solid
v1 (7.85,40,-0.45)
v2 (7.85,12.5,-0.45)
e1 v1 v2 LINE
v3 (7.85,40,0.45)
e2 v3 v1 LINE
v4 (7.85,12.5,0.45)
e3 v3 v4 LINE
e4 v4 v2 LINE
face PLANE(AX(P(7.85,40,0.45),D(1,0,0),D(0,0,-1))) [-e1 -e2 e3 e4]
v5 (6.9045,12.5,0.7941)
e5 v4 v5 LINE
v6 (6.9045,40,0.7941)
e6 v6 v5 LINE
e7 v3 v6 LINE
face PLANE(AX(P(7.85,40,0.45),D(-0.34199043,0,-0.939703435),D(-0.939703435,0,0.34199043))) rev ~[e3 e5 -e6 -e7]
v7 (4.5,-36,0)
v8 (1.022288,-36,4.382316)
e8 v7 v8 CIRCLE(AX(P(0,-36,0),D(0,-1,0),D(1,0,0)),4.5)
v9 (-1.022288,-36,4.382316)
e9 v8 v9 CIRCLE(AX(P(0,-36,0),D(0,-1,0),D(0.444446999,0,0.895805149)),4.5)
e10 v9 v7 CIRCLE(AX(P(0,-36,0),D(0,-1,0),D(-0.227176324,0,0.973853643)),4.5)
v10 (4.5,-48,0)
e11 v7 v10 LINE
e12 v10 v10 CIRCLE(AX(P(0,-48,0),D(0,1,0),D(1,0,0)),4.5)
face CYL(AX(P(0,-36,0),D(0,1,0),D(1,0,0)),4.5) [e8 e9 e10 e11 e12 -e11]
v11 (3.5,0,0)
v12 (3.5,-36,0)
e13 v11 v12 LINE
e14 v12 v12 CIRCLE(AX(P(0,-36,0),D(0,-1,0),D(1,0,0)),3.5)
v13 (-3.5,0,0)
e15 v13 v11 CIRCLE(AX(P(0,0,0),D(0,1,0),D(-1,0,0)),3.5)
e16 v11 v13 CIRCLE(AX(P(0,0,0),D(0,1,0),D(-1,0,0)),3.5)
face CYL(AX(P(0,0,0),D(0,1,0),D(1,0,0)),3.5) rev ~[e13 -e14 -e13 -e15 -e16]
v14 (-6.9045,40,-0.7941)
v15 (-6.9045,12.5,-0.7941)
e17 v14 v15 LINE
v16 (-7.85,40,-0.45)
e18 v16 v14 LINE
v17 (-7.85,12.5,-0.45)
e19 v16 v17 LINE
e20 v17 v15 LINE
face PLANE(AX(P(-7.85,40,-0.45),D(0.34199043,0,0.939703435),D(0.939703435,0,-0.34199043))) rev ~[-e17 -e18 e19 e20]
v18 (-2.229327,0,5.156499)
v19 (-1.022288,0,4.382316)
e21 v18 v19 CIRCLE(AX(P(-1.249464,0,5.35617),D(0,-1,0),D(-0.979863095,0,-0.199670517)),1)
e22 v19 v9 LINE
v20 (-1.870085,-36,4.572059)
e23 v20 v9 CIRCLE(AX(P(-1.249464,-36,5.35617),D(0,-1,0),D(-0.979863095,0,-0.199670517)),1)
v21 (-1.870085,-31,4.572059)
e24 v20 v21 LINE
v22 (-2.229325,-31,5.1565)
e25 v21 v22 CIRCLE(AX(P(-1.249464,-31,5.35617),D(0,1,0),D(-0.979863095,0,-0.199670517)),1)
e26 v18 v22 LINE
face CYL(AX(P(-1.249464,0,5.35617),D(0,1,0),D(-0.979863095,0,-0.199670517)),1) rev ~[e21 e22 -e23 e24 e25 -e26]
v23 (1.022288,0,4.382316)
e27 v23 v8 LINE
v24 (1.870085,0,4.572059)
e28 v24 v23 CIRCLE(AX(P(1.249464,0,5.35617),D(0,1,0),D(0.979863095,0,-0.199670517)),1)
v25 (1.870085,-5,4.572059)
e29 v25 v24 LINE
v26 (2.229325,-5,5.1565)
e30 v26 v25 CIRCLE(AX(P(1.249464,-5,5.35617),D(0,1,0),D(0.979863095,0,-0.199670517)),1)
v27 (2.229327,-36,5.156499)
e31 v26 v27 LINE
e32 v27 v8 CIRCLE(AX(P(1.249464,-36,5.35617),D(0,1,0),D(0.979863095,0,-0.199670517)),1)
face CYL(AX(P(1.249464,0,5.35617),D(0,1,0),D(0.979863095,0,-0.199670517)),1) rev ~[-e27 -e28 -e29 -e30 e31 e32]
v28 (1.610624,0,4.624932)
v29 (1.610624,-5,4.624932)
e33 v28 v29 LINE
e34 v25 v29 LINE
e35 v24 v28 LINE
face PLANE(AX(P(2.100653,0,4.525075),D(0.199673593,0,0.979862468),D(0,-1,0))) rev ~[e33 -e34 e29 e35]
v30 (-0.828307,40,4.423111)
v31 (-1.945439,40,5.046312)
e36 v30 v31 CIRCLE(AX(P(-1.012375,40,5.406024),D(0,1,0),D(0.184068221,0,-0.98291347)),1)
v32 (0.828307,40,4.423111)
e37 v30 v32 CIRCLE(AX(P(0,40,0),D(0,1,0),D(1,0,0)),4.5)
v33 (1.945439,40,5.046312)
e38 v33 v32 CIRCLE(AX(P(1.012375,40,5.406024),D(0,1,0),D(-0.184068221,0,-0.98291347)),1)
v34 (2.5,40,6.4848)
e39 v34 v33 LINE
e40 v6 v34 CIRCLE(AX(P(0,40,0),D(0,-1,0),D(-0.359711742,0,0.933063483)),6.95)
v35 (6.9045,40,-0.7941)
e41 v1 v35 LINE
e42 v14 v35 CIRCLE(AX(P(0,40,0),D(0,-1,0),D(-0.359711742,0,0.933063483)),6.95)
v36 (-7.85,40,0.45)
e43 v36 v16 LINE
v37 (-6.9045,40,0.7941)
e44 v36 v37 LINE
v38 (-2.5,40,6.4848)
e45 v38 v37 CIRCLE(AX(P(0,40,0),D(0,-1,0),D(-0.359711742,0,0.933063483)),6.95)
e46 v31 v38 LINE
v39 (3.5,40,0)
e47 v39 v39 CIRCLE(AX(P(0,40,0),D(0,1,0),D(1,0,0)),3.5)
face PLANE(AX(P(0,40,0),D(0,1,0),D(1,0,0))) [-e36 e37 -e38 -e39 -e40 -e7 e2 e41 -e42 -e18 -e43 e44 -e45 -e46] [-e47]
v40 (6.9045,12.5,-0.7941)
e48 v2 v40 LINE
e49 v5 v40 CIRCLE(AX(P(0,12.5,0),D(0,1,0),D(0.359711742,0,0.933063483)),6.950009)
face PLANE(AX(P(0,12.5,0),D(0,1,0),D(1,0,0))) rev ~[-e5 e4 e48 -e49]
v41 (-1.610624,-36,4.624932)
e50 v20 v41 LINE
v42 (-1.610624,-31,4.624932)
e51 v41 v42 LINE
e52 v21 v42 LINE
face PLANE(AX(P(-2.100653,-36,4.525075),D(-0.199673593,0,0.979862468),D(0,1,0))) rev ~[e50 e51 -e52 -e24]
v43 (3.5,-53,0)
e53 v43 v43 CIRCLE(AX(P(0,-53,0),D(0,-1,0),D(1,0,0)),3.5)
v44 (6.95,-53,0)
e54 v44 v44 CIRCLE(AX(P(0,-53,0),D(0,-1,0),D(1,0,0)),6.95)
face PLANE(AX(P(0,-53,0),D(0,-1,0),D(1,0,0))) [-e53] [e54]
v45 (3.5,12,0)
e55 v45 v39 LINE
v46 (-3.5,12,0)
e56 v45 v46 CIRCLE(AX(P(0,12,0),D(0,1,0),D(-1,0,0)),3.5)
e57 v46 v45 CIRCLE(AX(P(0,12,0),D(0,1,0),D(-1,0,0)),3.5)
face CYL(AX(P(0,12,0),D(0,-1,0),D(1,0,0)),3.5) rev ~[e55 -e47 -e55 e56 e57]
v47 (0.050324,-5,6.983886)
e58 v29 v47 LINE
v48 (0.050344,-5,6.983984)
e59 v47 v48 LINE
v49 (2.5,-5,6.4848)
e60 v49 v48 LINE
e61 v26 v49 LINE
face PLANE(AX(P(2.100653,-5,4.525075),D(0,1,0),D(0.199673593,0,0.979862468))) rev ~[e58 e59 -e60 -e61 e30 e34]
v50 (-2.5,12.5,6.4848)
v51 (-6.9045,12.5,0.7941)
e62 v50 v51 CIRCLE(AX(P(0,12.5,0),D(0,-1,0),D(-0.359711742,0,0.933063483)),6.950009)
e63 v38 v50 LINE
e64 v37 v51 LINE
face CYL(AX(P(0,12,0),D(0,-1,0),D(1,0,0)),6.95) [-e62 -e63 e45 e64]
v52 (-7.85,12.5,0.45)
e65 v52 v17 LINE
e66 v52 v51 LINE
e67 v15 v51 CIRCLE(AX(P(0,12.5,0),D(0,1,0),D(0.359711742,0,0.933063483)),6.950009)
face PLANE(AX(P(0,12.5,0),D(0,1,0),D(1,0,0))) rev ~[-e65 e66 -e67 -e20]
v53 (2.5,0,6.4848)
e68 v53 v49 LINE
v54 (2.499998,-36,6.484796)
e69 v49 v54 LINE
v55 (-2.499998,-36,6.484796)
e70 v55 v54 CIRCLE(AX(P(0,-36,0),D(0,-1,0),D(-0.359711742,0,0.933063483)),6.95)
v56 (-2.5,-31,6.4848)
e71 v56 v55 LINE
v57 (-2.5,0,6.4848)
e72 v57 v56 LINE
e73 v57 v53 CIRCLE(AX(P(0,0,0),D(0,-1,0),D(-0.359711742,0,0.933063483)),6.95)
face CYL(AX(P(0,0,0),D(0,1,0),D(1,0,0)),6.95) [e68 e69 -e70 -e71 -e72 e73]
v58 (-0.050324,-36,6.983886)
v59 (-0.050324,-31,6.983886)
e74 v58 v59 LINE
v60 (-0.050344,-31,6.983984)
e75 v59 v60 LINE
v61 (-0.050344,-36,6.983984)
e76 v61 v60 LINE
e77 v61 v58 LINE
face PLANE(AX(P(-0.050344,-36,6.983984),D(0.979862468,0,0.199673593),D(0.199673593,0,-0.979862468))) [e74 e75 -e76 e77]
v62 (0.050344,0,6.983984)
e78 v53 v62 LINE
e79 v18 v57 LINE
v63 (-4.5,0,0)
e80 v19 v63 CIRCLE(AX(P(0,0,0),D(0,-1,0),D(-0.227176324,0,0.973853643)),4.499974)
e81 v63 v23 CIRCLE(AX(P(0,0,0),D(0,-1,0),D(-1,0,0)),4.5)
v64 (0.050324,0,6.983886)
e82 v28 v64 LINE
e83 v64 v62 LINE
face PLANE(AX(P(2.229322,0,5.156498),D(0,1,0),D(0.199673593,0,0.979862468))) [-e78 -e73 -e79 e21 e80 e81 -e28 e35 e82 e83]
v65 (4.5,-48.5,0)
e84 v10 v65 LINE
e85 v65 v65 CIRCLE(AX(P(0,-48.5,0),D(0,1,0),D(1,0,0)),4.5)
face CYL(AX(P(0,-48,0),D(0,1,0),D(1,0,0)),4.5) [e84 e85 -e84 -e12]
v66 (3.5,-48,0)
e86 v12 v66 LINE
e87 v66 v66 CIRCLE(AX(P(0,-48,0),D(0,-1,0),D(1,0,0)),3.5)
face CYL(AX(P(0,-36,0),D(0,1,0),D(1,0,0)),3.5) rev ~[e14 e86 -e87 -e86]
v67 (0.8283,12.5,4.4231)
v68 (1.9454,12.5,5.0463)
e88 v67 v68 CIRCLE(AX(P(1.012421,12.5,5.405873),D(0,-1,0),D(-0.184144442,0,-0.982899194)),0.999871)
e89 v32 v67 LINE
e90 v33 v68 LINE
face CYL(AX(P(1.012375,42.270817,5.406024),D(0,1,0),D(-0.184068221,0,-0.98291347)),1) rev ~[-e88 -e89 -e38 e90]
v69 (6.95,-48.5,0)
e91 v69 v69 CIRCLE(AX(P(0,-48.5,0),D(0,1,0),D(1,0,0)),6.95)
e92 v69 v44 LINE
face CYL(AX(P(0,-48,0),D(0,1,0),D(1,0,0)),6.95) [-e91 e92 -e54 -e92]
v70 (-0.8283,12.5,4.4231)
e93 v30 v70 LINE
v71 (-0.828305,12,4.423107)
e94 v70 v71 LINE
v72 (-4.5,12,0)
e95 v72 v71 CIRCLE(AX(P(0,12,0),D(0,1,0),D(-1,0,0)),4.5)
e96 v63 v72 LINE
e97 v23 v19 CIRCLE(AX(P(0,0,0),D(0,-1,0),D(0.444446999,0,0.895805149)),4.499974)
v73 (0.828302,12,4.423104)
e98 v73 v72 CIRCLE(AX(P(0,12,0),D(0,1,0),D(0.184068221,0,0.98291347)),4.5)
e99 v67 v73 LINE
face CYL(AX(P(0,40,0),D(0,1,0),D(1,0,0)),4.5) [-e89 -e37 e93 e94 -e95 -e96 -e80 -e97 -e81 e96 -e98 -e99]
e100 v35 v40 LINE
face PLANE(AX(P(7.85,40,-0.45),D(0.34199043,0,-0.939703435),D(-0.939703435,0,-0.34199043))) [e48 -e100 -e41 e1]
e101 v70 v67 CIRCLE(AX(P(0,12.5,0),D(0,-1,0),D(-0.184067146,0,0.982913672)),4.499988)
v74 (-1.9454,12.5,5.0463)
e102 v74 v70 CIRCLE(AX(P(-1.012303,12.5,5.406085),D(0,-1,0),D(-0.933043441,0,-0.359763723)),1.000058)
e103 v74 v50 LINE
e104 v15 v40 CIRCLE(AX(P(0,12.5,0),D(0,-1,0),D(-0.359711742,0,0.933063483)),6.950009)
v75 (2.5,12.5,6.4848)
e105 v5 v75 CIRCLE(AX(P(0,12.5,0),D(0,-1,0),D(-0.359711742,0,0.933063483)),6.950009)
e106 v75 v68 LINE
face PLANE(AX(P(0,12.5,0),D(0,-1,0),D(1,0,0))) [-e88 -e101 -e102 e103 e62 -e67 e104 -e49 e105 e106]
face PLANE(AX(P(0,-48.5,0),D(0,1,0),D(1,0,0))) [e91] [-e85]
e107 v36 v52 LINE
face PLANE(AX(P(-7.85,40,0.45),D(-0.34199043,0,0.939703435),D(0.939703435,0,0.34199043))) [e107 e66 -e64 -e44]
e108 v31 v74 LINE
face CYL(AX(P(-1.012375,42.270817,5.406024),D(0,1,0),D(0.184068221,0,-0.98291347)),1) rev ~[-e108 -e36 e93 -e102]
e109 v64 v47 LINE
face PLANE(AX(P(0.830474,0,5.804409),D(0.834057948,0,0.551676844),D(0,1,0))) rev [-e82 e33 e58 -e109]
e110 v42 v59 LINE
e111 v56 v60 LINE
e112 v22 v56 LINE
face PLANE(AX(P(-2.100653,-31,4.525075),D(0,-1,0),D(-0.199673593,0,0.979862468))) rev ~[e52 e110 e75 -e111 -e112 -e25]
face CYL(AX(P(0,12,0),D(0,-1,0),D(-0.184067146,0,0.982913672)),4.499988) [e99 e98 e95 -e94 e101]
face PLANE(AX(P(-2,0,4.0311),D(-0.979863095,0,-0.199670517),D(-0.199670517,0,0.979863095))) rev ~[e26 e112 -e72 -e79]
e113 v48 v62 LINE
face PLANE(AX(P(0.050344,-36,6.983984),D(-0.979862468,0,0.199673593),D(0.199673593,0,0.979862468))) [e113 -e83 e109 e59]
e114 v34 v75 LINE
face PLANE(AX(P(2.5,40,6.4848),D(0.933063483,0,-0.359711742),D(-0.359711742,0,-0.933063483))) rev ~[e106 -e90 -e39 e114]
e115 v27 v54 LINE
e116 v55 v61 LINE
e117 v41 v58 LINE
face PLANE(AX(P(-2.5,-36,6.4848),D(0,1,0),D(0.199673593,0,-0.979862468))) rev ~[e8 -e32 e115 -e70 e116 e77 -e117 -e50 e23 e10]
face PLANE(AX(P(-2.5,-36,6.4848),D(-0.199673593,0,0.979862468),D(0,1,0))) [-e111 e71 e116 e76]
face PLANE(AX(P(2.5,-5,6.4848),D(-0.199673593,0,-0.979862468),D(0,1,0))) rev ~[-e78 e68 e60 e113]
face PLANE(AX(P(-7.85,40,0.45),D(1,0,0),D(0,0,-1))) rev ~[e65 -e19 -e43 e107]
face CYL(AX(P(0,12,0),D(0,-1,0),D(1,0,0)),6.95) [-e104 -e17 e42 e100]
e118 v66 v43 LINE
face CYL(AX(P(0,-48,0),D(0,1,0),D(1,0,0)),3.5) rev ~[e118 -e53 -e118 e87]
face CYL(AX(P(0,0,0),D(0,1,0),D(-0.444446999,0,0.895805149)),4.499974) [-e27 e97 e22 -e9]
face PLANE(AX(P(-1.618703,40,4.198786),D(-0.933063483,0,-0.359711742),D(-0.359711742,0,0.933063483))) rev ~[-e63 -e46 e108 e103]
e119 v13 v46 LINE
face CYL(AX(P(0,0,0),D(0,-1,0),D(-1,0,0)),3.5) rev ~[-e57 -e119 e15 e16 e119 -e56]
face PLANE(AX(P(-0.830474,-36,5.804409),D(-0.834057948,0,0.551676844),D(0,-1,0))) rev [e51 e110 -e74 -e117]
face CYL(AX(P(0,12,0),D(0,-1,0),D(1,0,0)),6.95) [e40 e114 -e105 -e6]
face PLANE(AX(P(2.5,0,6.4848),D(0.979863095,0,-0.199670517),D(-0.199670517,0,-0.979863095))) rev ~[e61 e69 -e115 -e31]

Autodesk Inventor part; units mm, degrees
sketch "Sketch1" plane through (0, 0, 0) normal (0, 1, 0) x (-1, 0, 0)
  circle A0 centre (0, 0) radius 3.5
  circle A1 centre (0, 0) radius 4.5
  dimension "OD" = 9
  dimension "ID" = 7
extrude "Extrusion1" add sketch "Sketch1" along normal blind 12
ref_plane "Work Plane1" through (0, 0, -10) normal (-1, 0, 0) x (0, 0, 1)
sketch "Sketch2" plane through (0, 0, -10) normal (-1, 0, 0) x (0, 0, 1)
  circle A0 centre (14.67, 11.4) radius 0.6
  line L0 (5.5, 0) -> (14.5, 0) projected
  line L1 (14.5, 0) -> (14.5, 12) projected
  point P0 (10, 0)
  point P1 (14.5, 11.9754)
  dimension "d10" = 1.2
  dimension "d12" = 0.17
  dimension "d119" = 0.6
sketch "Sketch3" plane through (0, 0, 0) normal (0, -1, 0) x (1, 0, 0)
  circle A0 centre (0, 0) radius 3.5
  circle A1 centre (0, 0) radius 6.95
  dimension "d21" = 7
  dimension "OOD" = 13.9
extrude "Extrusion2" add sketch "Sketch3" along normal blind 36
sketch "Sketch4" plane through (0, -36, 0) normal (0, -1, 0) x (1, 0, 0)
  circle A0 centre (0, 0) radius 3.5
  circle A1 centre (0, 0) radius 4.5
  dimension "d25" = 7
  dimension "d26" = 9
extrude "Extrusion3" add sketch "Sketch4" along normal blind 12
sketch "Sketch5" plane through (0, 0, -10) normal (-1, 0, 0) x (0, 0, 1)
  circle A0 centre (14.67, -36.6) radius 0.6
  line L0 (14.5, -36) -> (14.5, -48) projected
  line L1 (3.05, -36) -> (16.95, -36) projected
  point P0 (10, 0)
  point P1 (14.5, -37.1754)
  point P2 (14.5, -36.0246)
  dimension "d29" = 1.2
  dimension "d30" = 0.17
  dimension "d31" = 0.6
sketch "Sketch6" plane through (0, 0, 0) normal (0, 1, 0) x (1, 0, 0)
  arc A0 (-2, -4.0311) -> (2, -4.0311) centre (0, 0) ccw
  arc A1 (-2.5, -6.4848) -> (2.5, -6.4848) centre (0, 0) ccw
  circle A2 centre (0, 0) radius 6.95 projected
  line L0 (2.5, -6.4848) -> (2, -4.0311)
  circle A3 centre (0, 0) radius 4.5 projected
  line L1 (-2, -4.0311) -> (-2.5, -6.4848)
  line L2 (0, -9.73) -> (0, 9.73) projected
  dimension "d42" = 5
  dimension "d43" = 4
  dimension "d45" = 2
  dimension "d46" = 2.5
extrude "Extrusion4" cut sketch "Sketch6" against normal blind 121.2 contours A0 L2 A1 L1 | A0 L0 A1 L2
fillet "Fillet1" radius 1 2 edges at (2, -18, 4.0311) (-2, -18, 4.0311)
ref_plane "Work Plane5" through (-10, 45, 0) normal (0, -1, 0) x (1, 0, 0)
ref_plane "Work Plane4" through (-10, 0, 0) normal (0, -1, 0) x (1, 0, 0)
sketch "Sketch13" plane through (0, 12, 0) normal (0, 1, 0) x (1, 0, 0)
  circle A0 centre (0, 0) radius 3.5
  circle A1 centre (0, 0) radius 6.95
  dimension "d75" = 13.9
  dimension "d105" = 7
extrude "Extrusion9" add sketch "Sketch13" along normal blind 28
sketch "Sketch17" plane through (2.5, -36, 6.4848) normal (-0.9798625, 0, 0.1996736) x (0.1996736, 0, 0.9798625)
  line L0 (-1.3556, 36) -> (0, 36) projected
  line L1 (0, 36) -> (-2, 36)
  line L2 (-2, 36) -> (-2, 31)
  line L3 (-2, 31) -> (0, 31)
  line L4 (0, 31) -> (0, 36)
  point P0 (-6.8534, 36)
  point P1 (-6.5156, 60)
  dimension "d94" = 2
  dimension "d95" = 5
extrude "Extrusion13" add sketch "Sketch17" along normal blind 2.5
sketch "Sketch18" plane through (-2.5, -36, 6.4848) normal (0.9798625, 0, 0.1996736) x (0.1996736, 0, -0.9798625)
  line L0 (0, 0) -> (0, 36) projected
  line L1 (0, 0) -> (2, 0)
  line L2 (2, 0) -> (2, 5)
  line L3 (2, 5) -> (0, 5)
  line L4 (0, 5) -> (0, 0)
  point P0 (6.8534, 36)
  dimension "d98" = 2
  dimension "d99" = 5
extrude "Extrusion14" add sketch "Sketch18" along normal blind 2.5
sketch "Sketch20" plane through (0, 40, 0) normal (0, 1, 0) x (1, 0, 0)
  circle A0 centre (0, 0) radius 3.5 construction
  circle A1 centre (0, 0) radius 6.95 construction
  arc A2 (2.5, -6.4848) -> (-2.5, -6.4848) centre (0, 0) ccw projected
  circle A3 centre (0, 0) radius 4.5
  arc A4 (-2.5, -6.4848) -> (2.5, -6.4848) centre (0, 0) ccw
  arc A5 (2.5, -6.4848) -> (-2.5, -6.4848) centre (0, 0) ccw projected
  line L0 (2.5, -6.4848) -> (0, 0)
  line L1 (0, 0) -> (-2.5, -6.4848)
  point P0 (0, -4.5)
  point P1 (1.6187, -4.1988)
  point P2 (-1.6187, -4.1988)
extrude "Extrusion16" cut sketch "Sketch20" against normal up to surface (28 mm away) contours A4 L1 A3 L0
fillet "Fillet3" radius 1 2 edges at (1.6187, 26, 4.1988) (-1.6187, 26, 4.1988)
sketch "Sketch21" plane through (0, -48, 0) normal (0, -1, 0) x (1, 0, 0)
  circle A0 centre (0, 0) radius 3.5 projected
  circle A1 centre (0, 0) radius 6.95
  dimension "d109" = 13.9
extrude "Extrusion17" add sketch "Sketch21" along normal blind 5
sketch "Sketch22" plane through (0, -48, 0) normal (0, 1, 0) x (1, 0, 0)
  circle A0 centre (0, 0) radius 6.95 projected
  circle A1 centre (0, 0) radius 4.5 projected
extrude "Extrusion18" cut sketch "Sketch22" against normal blind 0.5
sketch "Sketch23" plane through (0, 12, 0) normal (0, -1, 0) x (1, 0, 0)
  arc A0 (-0.8283, 4.4231) -> (0.8283, 4.4231) centre (0, 0) ccw projected
  arc A1 (-1.9454, 5.0463) -> (-0.8283, 4.4231) centre (-1.0124, 5.406) ccw projected
  line L0 (-1.9454, 5.0463) -> (-2.5, 6.4848) projected
  arc A2 (-2.5, 6.4848) -> (2.5, 6.4848) centre (0, 0) ccw projected
  line L1 (2.5, 6.4848) -> (1.9454, 5.0463) projected
  arc A3 (0.8283, 4.4231) -> (1.9454, 5.0463) centre (1.0124, 5.406) ccw projected
extrude "Extrusion19" cut sketch "Sketch23" against normal blind 0.5
chamfer "Chamfer1" distance 2 angle 45 2 edges at (-0.349, -2.5, 5.0242) (0.349, -33.5, 5.0242)
ref_plane "Work Plane6" through (0, -18, 0) normal (0, 1, 0) x (1, 0, 0)
sketch "Sketch24" plane through (0, 40, 0) normal (0, 1, 0) x (1, 0, 0)
  line L0 (7.85, -0.45) -> (7.85, 0.45)
  line L1 (7.85, 0.45) -> (6.9045, 0.7941)
  arc A0 (2.5, -6.4848) -> (-2.5, -6.4848) centre (0, 0) ccw projected
  line L2 (7.85, -0.45) -> (6.9045, -0.7941)
  line L3 (-7.85, -0.45) -> (-7.85, 0.45)
  line L4 (-7.85, 0.45) -> (-6.9045, 0.7941)
  arc A1 (2.5, -6.4848) -> (-2.5, -6.4848) centre (0, 0) ccw projected
  line L5 (-7.85, -0.45) -> (-6.9045, -0.7941)
  dimension "d121" = 0.9
  dimension "d123" = 0.9
  dimension "d125" = 110
  dimension "d126" = 110
  dimension "d128" = 0.9
  dimension "d129" = 0.9
  dimension "d130" = 110
  dimension "d131" = 110
extrude "Extrusion20" add sketch "Sketch24" against normal up to surface (27.5 mm away)
equation "\"d21\" = ID"
equation "\"d25\" = ID"
equation "\"d26\" = OD"
equation "\"d75\" = OOD"
equation "\"d105\" = ID"
equation "\"d109\" = OOD"
properties part number "2101_Rx Coil Body_V1"
